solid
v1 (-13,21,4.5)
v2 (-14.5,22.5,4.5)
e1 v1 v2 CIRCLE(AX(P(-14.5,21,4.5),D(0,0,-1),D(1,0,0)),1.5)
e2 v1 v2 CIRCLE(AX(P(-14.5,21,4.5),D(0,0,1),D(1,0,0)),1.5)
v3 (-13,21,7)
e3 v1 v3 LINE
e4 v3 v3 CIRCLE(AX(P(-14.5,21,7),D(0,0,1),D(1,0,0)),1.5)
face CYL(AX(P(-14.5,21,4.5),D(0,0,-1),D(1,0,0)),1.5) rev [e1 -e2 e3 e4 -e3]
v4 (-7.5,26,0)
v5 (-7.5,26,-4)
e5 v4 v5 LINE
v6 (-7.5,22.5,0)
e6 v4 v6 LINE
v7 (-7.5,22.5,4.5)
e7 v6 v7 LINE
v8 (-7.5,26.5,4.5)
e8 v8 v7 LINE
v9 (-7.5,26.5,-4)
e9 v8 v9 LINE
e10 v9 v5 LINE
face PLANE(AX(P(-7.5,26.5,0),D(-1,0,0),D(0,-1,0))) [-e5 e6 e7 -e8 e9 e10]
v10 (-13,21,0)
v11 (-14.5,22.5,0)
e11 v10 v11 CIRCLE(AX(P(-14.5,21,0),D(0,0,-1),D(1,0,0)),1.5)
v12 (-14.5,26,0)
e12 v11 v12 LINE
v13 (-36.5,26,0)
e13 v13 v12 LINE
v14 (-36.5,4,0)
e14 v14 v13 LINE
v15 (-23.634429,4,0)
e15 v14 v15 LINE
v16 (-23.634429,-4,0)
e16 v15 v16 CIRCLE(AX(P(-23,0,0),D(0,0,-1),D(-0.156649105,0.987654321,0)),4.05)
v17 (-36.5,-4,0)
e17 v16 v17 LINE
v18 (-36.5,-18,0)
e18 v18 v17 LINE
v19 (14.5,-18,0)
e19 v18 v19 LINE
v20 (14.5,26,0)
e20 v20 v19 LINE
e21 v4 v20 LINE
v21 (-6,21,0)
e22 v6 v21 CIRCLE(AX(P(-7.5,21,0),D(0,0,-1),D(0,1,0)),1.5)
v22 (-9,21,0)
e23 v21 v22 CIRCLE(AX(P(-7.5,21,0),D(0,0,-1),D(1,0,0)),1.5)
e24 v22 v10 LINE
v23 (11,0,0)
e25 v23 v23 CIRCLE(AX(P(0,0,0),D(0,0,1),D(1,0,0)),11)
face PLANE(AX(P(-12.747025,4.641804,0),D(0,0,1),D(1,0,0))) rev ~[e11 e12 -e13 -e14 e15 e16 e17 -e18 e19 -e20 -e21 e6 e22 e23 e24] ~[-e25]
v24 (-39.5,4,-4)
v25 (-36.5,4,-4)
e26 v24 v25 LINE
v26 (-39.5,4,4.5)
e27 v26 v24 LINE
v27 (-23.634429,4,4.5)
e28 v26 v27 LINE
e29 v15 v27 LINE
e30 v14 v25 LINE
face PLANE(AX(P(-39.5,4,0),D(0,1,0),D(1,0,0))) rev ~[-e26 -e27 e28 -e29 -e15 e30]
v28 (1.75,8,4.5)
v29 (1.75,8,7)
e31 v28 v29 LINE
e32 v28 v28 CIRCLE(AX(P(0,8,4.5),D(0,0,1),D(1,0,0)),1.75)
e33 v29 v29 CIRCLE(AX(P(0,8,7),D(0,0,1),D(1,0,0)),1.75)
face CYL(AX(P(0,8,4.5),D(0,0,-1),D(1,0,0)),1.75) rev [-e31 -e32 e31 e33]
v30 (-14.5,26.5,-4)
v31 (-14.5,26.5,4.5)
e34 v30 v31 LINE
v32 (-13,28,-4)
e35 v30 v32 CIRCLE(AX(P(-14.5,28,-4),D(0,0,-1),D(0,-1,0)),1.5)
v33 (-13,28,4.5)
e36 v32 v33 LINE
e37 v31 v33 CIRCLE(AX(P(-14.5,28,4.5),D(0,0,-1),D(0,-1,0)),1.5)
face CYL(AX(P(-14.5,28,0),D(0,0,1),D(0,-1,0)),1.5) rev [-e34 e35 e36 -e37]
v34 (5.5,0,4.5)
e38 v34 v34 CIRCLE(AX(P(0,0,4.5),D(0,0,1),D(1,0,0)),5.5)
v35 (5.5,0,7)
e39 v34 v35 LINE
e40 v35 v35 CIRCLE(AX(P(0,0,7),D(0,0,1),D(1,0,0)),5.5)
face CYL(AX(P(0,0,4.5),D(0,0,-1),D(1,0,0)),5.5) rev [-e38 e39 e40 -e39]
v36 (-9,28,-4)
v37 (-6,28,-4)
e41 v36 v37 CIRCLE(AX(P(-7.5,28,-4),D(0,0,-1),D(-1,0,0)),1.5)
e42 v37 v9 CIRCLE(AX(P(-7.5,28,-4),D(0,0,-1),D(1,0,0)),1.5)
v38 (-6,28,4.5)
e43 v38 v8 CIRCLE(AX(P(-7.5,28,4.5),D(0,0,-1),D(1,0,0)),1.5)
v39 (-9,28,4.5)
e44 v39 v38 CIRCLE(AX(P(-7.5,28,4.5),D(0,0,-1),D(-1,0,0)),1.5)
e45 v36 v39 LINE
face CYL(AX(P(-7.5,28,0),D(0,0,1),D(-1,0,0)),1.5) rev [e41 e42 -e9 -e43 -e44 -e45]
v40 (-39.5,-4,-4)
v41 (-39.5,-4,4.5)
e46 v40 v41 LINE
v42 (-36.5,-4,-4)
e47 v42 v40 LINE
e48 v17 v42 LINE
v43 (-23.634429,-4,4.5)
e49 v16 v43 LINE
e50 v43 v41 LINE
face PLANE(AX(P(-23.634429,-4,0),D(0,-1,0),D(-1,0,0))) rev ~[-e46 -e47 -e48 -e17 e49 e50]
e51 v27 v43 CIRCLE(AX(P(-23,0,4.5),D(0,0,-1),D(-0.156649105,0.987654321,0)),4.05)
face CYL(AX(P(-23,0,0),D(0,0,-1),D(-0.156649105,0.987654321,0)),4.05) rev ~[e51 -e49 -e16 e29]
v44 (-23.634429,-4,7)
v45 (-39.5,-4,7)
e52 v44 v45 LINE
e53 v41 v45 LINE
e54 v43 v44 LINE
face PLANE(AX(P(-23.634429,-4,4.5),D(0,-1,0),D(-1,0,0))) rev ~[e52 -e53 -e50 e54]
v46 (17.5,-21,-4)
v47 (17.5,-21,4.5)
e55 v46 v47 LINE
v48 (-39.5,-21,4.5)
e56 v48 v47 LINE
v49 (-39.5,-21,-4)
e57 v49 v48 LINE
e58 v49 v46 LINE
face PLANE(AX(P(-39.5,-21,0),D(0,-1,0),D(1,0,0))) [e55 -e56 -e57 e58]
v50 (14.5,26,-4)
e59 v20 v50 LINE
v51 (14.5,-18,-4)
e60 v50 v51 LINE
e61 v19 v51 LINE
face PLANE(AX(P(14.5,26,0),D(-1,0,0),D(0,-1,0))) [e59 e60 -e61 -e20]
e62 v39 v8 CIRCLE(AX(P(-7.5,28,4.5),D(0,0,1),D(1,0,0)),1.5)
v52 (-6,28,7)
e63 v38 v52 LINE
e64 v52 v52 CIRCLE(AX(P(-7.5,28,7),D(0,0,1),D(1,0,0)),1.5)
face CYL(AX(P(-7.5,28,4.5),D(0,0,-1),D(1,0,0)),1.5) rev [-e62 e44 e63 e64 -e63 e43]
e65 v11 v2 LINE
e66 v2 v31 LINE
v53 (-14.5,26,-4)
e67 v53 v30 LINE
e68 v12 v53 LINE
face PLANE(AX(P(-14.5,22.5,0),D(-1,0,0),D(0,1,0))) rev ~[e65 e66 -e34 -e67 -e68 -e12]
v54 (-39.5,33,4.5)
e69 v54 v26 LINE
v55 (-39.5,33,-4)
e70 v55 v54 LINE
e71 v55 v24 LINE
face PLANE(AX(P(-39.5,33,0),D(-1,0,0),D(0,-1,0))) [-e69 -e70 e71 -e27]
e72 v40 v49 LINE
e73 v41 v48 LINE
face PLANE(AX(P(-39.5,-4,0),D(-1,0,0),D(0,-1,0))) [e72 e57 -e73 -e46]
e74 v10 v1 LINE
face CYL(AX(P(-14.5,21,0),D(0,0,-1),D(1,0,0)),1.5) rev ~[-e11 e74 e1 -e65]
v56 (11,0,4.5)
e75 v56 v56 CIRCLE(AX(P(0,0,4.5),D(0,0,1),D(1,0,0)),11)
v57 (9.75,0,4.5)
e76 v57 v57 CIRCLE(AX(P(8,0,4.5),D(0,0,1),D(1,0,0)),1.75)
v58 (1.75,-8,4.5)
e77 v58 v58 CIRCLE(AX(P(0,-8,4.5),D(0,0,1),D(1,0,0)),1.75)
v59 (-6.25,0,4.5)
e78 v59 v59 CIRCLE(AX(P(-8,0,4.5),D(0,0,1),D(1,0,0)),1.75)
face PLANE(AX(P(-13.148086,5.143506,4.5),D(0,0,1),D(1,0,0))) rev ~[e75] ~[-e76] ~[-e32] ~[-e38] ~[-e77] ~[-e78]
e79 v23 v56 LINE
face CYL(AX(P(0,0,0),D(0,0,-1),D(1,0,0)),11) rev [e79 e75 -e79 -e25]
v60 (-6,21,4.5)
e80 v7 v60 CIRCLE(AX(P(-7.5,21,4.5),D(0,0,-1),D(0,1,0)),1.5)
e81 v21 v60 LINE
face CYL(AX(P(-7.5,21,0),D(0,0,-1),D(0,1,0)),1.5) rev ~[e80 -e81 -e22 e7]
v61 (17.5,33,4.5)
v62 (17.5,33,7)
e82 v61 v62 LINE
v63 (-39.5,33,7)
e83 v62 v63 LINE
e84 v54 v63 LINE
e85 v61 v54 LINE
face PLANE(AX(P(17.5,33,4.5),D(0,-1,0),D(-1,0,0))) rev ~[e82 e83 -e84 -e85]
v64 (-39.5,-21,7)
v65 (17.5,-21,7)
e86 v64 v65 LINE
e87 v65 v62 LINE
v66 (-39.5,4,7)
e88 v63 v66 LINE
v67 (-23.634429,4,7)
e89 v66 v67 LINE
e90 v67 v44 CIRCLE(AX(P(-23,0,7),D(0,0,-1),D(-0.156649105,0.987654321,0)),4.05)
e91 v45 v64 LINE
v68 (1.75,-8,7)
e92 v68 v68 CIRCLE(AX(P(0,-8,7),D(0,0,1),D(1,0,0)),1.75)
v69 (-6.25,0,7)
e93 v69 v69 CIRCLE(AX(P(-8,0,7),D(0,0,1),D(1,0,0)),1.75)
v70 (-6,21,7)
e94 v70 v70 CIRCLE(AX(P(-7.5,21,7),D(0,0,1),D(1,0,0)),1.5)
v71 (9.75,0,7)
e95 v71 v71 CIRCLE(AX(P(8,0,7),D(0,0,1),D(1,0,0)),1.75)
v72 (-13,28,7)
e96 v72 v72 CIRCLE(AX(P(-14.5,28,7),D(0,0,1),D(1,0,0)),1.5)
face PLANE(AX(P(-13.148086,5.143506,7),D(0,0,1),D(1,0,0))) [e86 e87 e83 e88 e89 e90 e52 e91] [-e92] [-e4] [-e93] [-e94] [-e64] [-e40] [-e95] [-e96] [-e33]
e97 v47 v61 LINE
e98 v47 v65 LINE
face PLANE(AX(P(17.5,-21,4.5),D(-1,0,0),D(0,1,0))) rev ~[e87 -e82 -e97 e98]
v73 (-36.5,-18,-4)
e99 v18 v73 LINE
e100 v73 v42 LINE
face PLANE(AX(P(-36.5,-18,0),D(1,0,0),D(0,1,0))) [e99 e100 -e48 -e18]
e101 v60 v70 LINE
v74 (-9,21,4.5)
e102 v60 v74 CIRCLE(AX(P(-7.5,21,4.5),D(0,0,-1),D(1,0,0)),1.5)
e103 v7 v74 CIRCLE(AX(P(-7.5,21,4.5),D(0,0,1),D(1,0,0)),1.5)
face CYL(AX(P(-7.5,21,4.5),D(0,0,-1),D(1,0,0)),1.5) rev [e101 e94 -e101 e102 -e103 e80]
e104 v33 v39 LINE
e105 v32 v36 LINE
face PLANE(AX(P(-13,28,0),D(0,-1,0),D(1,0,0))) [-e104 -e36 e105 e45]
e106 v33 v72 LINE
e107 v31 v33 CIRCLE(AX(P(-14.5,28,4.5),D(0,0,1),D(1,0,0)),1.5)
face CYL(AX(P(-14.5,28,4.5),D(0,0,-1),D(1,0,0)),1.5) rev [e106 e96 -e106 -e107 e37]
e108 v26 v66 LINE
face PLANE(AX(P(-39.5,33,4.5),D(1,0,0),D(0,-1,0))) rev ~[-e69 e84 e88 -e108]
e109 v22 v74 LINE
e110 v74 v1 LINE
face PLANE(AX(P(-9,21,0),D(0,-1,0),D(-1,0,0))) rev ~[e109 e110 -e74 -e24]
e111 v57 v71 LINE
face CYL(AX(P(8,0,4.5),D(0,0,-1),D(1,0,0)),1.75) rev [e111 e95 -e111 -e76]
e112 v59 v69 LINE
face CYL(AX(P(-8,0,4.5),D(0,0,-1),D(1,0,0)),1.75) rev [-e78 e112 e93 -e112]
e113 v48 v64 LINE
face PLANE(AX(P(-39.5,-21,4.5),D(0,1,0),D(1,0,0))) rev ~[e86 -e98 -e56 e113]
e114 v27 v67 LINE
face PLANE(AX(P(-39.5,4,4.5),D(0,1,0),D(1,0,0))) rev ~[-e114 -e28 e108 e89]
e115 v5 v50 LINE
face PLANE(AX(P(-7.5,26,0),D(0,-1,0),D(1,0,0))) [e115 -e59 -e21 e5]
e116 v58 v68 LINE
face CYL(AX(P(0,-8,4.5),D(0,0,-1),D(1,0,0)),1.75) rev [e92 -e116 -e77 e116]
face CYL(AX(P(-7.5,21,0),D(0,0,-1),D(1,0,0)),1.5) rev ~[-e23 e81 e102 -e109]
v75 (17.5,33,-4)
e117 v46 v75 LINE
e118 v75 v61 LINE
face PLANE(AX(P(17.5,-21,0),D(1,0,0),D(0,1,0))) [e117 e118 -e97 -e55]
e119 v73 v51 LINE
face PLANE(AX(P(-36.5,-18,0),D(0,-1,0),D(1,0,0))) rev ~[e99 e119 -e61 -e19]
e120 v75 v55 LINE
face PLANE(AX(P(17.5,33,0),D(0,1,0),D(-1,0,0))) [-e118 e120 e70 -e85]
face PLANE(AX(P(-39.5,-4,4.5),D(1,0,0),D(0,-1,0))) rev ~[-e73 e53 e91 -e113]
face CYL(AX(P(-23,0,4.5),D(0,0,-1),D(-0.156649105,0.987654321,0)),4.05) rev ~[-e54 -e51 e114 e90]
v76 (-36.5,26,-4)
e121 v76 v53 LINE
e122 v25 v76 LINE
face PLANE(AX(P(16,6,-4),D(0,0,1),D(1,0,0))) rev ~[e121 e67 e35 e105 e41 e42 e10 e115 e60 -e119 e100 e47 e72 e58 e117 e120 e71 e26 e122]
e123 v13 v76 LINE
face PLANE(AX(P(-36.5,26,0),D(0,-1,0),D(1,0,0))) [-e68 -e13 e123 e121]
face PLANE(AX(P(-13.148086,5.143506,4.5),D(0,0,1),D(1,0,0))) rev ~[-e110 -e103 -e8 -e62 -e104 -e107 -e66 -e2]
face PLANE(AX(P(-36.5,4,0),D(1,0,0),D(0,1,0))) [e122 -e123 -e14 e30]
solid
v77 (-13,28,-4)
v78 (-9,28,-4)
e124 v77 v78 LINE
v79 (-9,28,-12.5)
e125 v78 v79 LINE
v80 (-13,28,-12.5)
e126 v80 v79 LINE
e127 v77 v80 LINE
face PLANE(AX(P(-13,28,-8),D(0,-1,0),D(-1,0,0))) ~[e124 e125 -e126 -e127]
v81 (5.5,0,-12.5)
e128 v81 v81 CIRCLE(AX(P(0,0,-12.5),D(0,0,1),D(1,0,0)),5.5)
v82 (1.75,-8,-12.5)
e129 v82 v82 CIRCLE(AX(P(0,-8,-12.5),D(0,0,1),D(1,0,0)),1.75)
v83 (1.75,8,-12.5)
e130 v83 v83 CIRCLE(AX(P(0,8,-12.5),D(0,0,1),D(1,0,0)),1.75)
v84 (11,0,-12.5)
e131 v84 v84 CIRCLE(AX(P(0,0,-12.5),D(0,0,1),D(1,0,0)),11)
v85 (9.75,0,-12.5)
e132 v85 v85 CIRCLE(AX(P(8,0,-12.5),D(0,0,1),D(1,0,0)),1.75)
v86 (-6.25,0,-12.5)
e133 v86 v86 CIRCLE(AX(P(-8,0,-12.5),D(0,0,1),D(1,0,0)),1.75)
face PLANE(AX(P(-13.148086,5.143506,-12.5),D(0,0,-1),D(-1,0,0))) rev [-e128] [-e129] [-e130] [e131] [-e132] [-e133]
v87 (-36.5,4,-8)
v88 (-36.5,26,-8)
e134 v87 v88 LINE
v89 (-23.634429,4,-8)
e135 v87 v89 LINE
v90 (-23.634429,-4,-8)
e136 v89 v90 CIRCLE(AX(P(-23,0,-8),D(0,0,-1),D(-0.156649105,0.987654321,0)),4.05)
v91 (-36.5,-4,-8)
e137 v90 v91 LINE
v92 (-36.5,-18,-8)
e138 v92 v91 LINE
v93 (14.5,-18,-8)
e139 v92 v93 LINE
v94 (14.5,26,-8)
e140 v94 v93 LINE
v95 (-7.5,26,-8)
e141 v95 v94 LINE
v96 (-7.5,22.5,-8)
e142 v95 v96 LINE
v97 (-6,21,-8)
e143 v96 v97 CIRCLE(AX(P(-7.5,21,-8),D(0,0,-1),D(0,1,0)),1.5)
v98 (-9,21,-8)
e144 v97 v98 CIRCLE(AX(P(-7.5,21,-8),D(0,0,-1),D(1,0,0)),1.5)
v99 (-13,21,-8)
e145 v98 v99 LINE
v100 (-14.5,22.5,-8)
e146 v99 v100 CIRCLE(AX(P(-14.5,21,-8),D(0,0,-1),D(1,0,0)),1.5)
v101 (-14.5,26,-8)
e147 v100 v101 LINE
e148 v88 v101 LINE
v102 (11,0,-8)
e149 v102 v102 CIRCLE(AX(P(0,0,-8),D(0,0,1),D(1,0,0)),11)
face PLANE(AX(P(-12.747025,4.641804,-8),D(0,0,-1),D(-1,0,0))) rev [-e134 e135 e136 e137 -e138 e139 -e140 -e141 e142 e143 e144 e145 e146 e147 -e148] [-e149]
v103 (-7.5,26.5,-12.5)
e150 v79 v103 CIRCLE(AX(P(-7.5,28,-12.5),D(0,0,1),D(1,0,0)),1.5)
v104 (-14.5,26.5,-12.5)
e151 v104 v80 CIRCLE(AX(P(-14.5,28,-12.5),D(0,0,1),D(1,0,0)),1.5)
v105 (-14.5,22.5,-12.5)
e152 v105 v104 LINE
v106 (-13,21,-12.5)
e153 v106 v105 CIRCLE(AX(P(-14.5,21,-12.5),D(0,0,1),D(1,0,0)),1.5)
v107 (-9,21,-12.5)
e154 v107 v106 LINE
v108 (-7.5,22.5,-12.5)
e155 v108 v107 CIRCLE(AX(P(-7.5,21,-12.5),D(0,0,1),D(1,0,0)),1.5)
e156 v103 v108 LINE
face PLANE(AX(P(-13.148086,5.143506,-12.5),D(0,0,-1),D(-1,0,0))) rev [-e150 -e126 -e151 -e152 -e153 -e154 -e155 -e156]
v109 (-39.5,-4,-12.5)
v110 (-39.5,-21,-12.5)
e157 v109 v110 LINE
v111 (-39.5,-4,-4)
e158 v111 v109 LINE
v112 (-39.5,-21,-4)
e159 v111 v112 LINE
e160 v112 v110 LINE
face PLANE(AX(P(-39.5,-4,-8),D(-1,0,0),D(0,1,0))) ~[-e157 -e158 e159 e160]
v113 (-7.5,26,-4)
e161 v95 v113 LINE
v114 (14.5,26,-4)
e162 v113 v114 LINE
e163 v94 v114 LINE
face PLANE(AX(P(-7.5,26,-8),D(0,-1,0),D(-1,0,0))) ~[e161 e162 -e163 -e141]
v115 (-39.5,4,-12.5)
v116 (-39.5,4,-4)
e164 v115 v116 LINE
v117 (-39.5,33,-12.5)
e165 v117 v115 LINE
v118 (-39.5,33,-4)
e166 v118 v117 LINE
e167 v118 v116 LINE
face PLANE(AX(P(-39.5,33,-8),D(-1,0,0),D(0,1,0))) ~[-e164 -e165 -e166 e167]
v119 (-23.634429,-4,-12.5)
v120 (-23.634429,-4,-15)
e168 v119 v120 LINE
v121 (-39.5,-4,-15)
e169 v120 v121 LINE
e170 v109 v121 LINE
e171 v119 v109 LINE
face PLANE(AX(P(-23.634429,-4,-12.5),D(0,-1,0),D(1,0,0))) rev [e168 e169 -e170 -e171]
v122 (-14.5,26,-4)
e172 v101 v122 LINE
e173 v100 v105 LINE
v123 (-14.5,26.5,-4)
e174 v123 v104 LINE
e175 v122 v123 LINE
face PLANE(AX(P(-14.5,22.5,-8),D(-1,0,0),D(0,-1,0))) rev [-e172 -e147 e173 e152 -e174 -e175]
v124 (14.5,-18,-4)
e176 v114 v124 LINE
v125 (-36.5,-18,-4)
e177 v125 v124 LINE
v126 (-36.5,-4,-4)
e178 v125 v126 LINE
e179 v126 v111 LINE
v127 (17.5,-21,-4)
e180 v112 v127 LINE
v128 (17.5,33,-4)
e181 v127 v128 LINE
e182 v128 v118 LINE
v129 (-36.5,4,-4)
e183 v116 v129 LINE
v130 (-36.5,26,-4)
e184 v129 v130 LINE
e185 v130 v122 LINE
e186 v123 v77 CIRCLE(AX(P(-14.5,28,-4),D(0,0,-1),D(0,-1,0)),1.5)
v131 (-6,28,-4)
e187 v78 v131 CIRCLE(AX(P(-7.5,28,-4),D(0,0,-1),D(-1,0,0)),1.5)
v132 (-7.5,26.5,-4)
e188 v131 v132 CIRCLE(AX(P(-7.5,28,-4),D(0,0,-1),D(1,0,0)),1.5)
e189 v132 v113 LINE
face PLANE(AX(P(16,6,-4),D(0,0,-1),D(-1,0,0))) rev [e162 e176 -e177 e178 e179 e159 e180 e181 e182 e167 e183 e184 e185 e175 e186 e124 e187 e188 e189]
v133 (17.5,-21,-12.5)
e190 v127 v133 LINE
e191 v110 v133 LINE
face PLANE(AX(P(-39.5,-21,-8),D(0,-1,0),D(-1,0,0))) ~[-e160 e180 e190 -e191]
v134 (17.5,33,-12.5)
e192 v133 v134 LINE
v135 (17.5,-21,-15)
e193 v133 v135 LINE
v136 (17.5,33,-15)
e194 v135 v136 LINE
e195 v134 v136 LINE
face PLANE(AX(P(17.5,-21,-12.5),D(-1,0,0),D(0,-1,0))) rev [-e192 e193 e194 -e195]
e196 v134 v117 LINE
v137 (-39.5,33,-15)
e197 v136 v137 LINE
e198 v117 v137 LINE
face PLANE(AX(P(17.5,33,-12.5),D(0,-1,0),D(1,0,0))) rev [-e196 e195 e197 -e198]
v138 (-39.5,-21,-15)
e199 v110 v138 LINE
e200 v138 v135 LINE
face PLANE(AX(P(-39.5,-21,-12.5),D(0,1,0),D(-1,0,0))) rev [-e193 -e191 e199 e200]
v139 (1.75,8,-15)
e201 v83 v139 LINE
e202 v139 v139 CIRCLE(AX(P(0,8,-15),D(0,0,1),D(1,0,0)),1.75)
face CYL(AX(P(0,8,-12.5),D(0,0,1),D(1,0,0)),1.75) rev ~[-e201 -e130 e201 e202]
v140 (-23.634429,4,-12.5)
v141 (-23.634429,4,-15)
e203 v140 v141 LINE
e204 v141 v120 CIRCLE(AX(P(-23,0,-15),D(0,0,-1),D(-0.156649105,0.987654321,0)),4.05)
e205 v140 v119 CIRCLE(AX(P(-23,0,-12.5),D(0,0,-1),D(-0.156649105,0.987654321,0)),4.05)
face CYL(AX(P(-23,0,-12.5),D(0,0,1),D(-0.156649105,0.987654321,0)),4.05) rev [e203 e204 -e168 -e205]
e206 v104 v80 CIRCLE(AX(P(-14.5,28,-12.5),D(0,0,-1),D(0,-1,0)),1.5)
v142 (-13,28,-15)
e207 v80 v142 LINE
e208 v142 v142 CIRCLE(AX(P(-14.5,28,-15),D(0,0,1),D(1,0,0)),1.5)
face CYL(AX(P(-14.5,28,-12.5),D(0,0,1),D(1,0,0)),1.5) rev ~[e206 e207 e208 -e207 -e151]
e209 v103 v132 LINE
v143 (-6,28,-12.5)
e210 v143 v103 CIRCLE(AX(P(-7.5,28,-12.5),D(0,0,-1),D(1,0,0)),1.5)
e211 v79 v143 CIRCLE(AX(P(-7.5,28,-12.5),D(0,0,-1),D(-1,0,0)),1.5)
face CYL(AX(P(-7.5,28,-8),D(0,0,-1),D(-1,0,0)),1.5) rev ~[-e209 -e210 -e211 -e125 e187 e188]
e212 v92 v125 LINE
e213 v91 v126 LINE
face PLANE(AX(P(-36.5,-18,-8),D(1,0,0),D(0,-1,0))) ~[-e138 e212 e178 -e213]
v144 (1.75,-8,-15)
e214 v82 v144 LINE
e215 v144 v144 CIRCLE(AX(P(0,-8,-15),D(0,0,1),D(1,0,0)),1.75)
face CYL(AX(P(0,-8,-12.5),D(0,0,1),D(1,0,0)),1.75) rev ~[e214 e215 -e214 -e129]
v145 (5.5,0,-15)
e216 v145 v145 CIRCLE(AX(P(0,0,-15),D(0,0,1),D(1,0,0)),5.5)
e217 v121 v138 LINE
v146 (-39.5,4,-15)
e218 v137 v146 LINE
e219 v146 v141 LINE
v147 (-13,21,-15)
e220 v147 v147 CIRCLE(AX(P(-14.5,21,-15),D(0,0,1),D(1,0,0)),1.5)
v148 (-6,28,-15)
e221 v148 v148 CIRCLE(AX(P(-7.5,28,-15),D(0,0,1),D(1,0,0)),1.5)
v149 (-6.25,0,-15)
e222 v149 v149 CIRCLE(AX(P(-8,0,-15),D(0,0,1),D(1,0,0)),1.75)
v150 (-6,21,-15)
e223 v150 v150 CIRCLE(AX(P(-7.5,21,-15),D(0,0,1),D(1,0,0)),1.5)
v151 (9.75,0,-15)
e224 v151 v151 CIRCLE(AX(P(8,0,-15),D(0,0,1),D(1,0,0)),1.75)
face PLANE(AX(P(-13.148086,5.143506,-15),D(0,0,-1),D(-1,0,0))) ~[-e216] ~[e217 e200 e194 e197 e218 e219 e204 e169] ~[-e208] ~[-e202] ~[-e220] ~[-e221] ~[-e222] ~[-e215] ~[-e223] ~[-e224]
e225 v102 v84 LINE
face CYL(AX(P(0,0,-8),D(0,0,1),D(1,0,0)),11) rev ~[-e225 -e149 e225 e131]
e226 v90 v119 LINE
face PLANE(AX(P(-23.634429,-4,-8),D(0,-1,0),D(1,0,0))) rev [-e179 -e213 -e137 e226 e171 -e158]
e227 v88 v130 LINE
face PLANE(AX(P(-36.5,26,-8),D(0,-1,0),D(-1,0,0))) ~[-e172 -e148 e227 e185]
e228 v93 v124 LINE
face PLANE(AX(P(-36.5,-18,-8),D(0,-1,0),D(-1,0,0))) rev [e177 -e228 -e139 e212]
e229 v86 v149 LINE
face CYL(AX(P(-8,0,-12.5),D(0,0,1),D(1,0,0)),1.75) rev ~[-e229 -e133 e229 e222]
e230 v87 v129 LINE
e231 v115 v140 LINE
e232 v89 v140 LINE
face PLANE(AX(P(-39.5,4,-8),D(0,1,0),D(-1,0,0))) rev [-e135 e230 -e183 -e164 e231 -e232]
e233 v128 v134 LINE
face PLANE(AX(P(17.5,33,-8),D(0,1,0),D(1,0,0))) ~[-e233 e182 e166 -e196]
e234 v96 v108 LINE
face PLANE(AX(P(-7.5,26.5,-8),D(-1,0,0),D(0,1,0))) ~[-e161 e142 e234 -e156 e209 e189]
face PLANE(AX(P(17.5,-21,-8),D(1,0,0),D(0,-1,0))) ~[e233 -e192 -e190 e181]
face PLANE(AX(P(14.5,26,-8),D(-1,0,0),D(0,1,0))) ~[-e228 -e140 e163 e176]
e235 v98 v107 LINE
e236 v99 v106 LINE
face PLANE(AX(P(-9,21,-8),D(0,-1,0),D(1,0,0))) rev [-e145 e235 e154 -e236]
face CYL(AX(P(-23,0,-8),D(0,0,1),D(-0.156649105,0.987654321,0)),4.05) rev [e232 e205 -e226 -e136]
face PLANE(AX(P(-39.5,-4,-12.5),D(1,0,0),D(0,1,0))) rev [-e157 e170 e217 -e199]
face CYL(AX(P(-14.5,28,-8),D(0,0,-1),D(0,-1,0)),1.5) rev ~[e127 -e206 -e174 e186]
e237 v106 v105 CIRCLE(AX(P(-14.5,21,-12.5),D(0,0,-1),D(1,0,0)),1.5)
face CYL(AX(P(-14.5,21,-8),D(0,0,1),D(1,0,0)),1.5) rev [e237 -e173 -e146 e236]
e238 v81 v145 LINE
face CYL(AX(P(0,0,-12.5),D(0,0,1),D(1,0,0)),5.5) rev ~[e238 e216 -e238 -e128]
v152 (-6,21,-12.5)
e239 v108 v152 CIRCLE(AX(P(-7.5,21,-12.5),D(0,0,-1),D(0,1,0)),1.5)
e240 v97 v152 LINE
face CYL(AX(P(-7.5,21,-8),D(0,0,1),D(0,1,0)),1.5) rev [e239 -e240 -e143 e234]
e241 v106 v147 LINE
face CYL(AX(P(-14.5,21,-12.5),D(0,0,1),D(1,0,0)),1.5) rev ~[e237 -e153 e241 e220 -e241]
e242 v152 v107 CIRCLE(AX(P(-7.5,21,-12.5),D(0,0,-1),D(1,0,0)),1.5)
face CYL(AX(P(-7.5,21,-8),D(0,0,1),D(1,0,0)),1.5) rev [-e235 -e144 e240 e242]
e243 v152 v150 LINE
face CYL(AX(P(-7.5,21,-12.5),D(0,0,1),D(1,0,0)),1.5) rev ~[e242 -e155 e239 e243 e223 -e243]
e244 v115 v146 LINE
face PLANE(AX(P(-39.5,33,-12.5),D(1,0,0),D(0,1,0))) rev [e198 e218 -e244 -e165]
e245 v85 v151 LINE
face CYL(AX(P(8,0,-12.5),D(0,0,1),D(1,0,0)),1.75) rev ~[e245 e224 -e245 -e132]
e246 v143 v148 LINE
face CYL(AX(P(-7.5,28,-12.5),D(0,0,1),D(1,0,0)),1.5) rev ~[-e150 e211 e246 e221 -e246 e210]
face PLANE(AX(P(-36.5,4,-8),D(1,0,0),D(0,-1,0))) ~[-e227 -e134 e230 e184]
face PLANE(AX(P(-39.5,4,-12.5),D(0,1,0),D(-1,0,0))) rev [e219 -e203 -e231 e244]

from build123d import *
from build123d import SkipClean  # not in build123d's __all__

# Parameters (mm, degrees)
F0_R     = 11
F0_W     = 51
F0_H     = 3
F1_DEPTH = 4.5
F2_DEPTH = 4
F3_R     = 1.75
F3_R_2   = 5.5
F3_R_3   = 1.5
F4_DEPTH = 2.5


with BuildPart() as f1:
    # F0 (on Top) → F1 (new body)
    with BuildSketch(Plane.XY):
        with BuildLine():
            Line((-14.5, 22.5), (-14.5, 26))
            Line((-14.5, 26), (-36.5, 26))
            Line((-36.5, 26), (-36.5, 4))
            Line((-36.5, 4), (-23.634428877, 4))
            ThreePointArc((-23.634428877, 4), (-20.3700700534, 3.0799299466), (-18.95, 0))
            ThreePointArc((-18.95, 0), (-20.3700700534, -3.0799299466), (-23.634428877, -4))
            Line((-23.634428877, -4), (-36.5, -4))
            Line((-36.5, -4), (-36.5, -18))
            Line((-36.5, -18), (14.5, -18))
            Line((14.5, -18), (14.5, 26))
            Line((14.5, 26), (-7.5, 26))
            Line((-7.5, 26), (-7.5, 22.5))
            ThreePointArc((-7.5, 22.5), (-6.4393398282, 22.0606601718), (-6, 21))
            ThreePointArc((-6, 21), (-7.5, 19.5), (-9, 21))
            Line((-9, 21), (-13, 21))
            ThreePointArc((-13, 21), (-15.5606601718, 19.9393398282), (-14.5, 22.5))
        make_face()
        Circle(F0_R, mode=Mode.SUBTRACT)
        with BuildLine():
            ThreePointArc((-14.5, 26.5), (-15.5606601718, 29.0606601718), (-13, 28))
            Line((-13, 28), (-9, 28))
            ThreePointArc((-9, 28), (-7.5, 29.5), (-6, 28))
            ThreePointArc((-6, 28), (-6.4393398282, 26.9393398282), (-7.5, 26.5))
            Line((-7.5, 26.5), (-7.5, 26))
            Line((-7.5, 26), (14.5, 26))
            Line((14.5, 26), (14.5, 33))
            Line((14.5, 33), (-36.5, 33))
            Line((-36.5, 33), (-36.5, 26))
            Line((-36.5, 26), (-14.5, 26))
            Line((-14.5, 26), (-14.5, 26.5))
        make_face()
        with Locations((-11, -19.5)):
            Rectangle(F0_W, F0_H)
        Polygon((14.5, 33), (14.5, 26), (14.5, -18), (14.5, -21), (17.5, -21), (17.5, 33), align=None)
        Polygon((-36.5, 4), (-36.5, 26), (-36.5, 33), (-39.5, 33), (-39.5, 4), align=None)
        Polygon((-36.5, -18), (-36.5, -4), (-39.5, -4), (-39.5, -21), (-36.5, -21), align=None)
    extrude(amount=F1_DEPTH)

    # F0 (on Top) → F2 (join)
    with BuildSketch(Plane.XY):
        Polygon((14.5, 33), (14.5, 26), (14.5, -18), (14.5, -21), (17.5, -21), (17.5, 33), align=None)
        with BuildLine():
            ThreePointArc((-14.5, 26.5), (-15.5606601718, 29.0606601718), (-13, 28))
            Line((-13, 28), (-9, 28))
            ThreePointArc((-9, 28), (-7.5, 29.5), (-6, 28))
            ThreePointArc((-6, 28), (-6.4393398282, 26.9393398282), (-7.5, 26.5))
            Line((-7.5, 26.5), (-7.5, 26))
            Line((-7.5, 26), (14.5, 26))
            Line((14.5, 26), (14.5, 33))
            Line((14.5, 33), (-36.5, 33))
            Line((-36.5, 33), (-36.5, 26))
            Line((-36.5, 26), (-14.5, 26))
            Line((-14.5, 26), (-14.5, 26.5))
        make_face()
        with Locations((-11, -19.5)):
            Rectangle(F0_W, F0_H)
        Polygon((-36.5, 4), (-36.5, 26), (-36.5, 33), (-39.5, 33), (-39.5, 4), align=None)
        Polygon((-36.5, -18), (-36.5, -4), (-39.5, -4), (-39.5, -21), (-36.5, -21), align=None)
    extrude(amount=-F2_DEPTH)

    # F3 (on face) → F4 (join)
    with BuildSketch(Plane.XY.offset(4.5)):
        with BuildLine():
            Line((-39.5, -4), (-39.5, -21))
            Line((-39.5, -21), (17.5, -21))
            Line((17.5, -21), (17.5, 33))
            Line((17.5, 33), (-39.5, 33))
            Line((-39.5, 33), (-39.5, 4))
            Line((-39.5, 4), (-23.634428877, 4))
            ThreePointArc((-23.634428877, 4), (-18.95, 0), (-23.634428877, -4))
            Line((-23.634428877, -4), (-39.5, -4))
        make_face()
        with Locations((0, -8)):
            Circle(F3_R, mode=Mode.SUBTRACT)
        with Locations((-8, 0)):
            Circle(F3_R, mode=Mode.SUBTRACT)
        Circle(F3_R_2, mode=Mode.SUBTRACT)
        with Locations((8, 0)):
            Circle(F3_R, mode=Mode.SUBTRACT)
        with Locations((-14.5, 21)):
            Circle(F3_R_3, mode=Mode.SUBTRACT)
        with Locations((-14.5, 28)):
            Circle(F3_R_3, mode=Mode.SUBTRACT)
        with Locations((0, 8)):
            Circle(F3_R, mode=Mode.SUBTRACT)
        with Locations((-7.5, 21)):
            Circle(F3_R_3, mode=Mode.SUBTRACT)
        with Locations((-7.5, 28)):
            Circle(F3_R_3, mode=Mode.SUBTRACT)
    with SkipClean():  # cleaning this boolean's faces spoils the solid; the shape is the same uncleaned
        extrude(amount=F4_DEPTH)


with BuildPart() as f5_1:
    # F5: instance of F1
    add(f1.part.mirror(Plane(origin=(-10.174939684, 11.2234552635, -4), x_dir=(1, 0, 0), z_dir=(0, 0, -1))), clean=False)


solid = Compound([f1.part, f5_1.part])
